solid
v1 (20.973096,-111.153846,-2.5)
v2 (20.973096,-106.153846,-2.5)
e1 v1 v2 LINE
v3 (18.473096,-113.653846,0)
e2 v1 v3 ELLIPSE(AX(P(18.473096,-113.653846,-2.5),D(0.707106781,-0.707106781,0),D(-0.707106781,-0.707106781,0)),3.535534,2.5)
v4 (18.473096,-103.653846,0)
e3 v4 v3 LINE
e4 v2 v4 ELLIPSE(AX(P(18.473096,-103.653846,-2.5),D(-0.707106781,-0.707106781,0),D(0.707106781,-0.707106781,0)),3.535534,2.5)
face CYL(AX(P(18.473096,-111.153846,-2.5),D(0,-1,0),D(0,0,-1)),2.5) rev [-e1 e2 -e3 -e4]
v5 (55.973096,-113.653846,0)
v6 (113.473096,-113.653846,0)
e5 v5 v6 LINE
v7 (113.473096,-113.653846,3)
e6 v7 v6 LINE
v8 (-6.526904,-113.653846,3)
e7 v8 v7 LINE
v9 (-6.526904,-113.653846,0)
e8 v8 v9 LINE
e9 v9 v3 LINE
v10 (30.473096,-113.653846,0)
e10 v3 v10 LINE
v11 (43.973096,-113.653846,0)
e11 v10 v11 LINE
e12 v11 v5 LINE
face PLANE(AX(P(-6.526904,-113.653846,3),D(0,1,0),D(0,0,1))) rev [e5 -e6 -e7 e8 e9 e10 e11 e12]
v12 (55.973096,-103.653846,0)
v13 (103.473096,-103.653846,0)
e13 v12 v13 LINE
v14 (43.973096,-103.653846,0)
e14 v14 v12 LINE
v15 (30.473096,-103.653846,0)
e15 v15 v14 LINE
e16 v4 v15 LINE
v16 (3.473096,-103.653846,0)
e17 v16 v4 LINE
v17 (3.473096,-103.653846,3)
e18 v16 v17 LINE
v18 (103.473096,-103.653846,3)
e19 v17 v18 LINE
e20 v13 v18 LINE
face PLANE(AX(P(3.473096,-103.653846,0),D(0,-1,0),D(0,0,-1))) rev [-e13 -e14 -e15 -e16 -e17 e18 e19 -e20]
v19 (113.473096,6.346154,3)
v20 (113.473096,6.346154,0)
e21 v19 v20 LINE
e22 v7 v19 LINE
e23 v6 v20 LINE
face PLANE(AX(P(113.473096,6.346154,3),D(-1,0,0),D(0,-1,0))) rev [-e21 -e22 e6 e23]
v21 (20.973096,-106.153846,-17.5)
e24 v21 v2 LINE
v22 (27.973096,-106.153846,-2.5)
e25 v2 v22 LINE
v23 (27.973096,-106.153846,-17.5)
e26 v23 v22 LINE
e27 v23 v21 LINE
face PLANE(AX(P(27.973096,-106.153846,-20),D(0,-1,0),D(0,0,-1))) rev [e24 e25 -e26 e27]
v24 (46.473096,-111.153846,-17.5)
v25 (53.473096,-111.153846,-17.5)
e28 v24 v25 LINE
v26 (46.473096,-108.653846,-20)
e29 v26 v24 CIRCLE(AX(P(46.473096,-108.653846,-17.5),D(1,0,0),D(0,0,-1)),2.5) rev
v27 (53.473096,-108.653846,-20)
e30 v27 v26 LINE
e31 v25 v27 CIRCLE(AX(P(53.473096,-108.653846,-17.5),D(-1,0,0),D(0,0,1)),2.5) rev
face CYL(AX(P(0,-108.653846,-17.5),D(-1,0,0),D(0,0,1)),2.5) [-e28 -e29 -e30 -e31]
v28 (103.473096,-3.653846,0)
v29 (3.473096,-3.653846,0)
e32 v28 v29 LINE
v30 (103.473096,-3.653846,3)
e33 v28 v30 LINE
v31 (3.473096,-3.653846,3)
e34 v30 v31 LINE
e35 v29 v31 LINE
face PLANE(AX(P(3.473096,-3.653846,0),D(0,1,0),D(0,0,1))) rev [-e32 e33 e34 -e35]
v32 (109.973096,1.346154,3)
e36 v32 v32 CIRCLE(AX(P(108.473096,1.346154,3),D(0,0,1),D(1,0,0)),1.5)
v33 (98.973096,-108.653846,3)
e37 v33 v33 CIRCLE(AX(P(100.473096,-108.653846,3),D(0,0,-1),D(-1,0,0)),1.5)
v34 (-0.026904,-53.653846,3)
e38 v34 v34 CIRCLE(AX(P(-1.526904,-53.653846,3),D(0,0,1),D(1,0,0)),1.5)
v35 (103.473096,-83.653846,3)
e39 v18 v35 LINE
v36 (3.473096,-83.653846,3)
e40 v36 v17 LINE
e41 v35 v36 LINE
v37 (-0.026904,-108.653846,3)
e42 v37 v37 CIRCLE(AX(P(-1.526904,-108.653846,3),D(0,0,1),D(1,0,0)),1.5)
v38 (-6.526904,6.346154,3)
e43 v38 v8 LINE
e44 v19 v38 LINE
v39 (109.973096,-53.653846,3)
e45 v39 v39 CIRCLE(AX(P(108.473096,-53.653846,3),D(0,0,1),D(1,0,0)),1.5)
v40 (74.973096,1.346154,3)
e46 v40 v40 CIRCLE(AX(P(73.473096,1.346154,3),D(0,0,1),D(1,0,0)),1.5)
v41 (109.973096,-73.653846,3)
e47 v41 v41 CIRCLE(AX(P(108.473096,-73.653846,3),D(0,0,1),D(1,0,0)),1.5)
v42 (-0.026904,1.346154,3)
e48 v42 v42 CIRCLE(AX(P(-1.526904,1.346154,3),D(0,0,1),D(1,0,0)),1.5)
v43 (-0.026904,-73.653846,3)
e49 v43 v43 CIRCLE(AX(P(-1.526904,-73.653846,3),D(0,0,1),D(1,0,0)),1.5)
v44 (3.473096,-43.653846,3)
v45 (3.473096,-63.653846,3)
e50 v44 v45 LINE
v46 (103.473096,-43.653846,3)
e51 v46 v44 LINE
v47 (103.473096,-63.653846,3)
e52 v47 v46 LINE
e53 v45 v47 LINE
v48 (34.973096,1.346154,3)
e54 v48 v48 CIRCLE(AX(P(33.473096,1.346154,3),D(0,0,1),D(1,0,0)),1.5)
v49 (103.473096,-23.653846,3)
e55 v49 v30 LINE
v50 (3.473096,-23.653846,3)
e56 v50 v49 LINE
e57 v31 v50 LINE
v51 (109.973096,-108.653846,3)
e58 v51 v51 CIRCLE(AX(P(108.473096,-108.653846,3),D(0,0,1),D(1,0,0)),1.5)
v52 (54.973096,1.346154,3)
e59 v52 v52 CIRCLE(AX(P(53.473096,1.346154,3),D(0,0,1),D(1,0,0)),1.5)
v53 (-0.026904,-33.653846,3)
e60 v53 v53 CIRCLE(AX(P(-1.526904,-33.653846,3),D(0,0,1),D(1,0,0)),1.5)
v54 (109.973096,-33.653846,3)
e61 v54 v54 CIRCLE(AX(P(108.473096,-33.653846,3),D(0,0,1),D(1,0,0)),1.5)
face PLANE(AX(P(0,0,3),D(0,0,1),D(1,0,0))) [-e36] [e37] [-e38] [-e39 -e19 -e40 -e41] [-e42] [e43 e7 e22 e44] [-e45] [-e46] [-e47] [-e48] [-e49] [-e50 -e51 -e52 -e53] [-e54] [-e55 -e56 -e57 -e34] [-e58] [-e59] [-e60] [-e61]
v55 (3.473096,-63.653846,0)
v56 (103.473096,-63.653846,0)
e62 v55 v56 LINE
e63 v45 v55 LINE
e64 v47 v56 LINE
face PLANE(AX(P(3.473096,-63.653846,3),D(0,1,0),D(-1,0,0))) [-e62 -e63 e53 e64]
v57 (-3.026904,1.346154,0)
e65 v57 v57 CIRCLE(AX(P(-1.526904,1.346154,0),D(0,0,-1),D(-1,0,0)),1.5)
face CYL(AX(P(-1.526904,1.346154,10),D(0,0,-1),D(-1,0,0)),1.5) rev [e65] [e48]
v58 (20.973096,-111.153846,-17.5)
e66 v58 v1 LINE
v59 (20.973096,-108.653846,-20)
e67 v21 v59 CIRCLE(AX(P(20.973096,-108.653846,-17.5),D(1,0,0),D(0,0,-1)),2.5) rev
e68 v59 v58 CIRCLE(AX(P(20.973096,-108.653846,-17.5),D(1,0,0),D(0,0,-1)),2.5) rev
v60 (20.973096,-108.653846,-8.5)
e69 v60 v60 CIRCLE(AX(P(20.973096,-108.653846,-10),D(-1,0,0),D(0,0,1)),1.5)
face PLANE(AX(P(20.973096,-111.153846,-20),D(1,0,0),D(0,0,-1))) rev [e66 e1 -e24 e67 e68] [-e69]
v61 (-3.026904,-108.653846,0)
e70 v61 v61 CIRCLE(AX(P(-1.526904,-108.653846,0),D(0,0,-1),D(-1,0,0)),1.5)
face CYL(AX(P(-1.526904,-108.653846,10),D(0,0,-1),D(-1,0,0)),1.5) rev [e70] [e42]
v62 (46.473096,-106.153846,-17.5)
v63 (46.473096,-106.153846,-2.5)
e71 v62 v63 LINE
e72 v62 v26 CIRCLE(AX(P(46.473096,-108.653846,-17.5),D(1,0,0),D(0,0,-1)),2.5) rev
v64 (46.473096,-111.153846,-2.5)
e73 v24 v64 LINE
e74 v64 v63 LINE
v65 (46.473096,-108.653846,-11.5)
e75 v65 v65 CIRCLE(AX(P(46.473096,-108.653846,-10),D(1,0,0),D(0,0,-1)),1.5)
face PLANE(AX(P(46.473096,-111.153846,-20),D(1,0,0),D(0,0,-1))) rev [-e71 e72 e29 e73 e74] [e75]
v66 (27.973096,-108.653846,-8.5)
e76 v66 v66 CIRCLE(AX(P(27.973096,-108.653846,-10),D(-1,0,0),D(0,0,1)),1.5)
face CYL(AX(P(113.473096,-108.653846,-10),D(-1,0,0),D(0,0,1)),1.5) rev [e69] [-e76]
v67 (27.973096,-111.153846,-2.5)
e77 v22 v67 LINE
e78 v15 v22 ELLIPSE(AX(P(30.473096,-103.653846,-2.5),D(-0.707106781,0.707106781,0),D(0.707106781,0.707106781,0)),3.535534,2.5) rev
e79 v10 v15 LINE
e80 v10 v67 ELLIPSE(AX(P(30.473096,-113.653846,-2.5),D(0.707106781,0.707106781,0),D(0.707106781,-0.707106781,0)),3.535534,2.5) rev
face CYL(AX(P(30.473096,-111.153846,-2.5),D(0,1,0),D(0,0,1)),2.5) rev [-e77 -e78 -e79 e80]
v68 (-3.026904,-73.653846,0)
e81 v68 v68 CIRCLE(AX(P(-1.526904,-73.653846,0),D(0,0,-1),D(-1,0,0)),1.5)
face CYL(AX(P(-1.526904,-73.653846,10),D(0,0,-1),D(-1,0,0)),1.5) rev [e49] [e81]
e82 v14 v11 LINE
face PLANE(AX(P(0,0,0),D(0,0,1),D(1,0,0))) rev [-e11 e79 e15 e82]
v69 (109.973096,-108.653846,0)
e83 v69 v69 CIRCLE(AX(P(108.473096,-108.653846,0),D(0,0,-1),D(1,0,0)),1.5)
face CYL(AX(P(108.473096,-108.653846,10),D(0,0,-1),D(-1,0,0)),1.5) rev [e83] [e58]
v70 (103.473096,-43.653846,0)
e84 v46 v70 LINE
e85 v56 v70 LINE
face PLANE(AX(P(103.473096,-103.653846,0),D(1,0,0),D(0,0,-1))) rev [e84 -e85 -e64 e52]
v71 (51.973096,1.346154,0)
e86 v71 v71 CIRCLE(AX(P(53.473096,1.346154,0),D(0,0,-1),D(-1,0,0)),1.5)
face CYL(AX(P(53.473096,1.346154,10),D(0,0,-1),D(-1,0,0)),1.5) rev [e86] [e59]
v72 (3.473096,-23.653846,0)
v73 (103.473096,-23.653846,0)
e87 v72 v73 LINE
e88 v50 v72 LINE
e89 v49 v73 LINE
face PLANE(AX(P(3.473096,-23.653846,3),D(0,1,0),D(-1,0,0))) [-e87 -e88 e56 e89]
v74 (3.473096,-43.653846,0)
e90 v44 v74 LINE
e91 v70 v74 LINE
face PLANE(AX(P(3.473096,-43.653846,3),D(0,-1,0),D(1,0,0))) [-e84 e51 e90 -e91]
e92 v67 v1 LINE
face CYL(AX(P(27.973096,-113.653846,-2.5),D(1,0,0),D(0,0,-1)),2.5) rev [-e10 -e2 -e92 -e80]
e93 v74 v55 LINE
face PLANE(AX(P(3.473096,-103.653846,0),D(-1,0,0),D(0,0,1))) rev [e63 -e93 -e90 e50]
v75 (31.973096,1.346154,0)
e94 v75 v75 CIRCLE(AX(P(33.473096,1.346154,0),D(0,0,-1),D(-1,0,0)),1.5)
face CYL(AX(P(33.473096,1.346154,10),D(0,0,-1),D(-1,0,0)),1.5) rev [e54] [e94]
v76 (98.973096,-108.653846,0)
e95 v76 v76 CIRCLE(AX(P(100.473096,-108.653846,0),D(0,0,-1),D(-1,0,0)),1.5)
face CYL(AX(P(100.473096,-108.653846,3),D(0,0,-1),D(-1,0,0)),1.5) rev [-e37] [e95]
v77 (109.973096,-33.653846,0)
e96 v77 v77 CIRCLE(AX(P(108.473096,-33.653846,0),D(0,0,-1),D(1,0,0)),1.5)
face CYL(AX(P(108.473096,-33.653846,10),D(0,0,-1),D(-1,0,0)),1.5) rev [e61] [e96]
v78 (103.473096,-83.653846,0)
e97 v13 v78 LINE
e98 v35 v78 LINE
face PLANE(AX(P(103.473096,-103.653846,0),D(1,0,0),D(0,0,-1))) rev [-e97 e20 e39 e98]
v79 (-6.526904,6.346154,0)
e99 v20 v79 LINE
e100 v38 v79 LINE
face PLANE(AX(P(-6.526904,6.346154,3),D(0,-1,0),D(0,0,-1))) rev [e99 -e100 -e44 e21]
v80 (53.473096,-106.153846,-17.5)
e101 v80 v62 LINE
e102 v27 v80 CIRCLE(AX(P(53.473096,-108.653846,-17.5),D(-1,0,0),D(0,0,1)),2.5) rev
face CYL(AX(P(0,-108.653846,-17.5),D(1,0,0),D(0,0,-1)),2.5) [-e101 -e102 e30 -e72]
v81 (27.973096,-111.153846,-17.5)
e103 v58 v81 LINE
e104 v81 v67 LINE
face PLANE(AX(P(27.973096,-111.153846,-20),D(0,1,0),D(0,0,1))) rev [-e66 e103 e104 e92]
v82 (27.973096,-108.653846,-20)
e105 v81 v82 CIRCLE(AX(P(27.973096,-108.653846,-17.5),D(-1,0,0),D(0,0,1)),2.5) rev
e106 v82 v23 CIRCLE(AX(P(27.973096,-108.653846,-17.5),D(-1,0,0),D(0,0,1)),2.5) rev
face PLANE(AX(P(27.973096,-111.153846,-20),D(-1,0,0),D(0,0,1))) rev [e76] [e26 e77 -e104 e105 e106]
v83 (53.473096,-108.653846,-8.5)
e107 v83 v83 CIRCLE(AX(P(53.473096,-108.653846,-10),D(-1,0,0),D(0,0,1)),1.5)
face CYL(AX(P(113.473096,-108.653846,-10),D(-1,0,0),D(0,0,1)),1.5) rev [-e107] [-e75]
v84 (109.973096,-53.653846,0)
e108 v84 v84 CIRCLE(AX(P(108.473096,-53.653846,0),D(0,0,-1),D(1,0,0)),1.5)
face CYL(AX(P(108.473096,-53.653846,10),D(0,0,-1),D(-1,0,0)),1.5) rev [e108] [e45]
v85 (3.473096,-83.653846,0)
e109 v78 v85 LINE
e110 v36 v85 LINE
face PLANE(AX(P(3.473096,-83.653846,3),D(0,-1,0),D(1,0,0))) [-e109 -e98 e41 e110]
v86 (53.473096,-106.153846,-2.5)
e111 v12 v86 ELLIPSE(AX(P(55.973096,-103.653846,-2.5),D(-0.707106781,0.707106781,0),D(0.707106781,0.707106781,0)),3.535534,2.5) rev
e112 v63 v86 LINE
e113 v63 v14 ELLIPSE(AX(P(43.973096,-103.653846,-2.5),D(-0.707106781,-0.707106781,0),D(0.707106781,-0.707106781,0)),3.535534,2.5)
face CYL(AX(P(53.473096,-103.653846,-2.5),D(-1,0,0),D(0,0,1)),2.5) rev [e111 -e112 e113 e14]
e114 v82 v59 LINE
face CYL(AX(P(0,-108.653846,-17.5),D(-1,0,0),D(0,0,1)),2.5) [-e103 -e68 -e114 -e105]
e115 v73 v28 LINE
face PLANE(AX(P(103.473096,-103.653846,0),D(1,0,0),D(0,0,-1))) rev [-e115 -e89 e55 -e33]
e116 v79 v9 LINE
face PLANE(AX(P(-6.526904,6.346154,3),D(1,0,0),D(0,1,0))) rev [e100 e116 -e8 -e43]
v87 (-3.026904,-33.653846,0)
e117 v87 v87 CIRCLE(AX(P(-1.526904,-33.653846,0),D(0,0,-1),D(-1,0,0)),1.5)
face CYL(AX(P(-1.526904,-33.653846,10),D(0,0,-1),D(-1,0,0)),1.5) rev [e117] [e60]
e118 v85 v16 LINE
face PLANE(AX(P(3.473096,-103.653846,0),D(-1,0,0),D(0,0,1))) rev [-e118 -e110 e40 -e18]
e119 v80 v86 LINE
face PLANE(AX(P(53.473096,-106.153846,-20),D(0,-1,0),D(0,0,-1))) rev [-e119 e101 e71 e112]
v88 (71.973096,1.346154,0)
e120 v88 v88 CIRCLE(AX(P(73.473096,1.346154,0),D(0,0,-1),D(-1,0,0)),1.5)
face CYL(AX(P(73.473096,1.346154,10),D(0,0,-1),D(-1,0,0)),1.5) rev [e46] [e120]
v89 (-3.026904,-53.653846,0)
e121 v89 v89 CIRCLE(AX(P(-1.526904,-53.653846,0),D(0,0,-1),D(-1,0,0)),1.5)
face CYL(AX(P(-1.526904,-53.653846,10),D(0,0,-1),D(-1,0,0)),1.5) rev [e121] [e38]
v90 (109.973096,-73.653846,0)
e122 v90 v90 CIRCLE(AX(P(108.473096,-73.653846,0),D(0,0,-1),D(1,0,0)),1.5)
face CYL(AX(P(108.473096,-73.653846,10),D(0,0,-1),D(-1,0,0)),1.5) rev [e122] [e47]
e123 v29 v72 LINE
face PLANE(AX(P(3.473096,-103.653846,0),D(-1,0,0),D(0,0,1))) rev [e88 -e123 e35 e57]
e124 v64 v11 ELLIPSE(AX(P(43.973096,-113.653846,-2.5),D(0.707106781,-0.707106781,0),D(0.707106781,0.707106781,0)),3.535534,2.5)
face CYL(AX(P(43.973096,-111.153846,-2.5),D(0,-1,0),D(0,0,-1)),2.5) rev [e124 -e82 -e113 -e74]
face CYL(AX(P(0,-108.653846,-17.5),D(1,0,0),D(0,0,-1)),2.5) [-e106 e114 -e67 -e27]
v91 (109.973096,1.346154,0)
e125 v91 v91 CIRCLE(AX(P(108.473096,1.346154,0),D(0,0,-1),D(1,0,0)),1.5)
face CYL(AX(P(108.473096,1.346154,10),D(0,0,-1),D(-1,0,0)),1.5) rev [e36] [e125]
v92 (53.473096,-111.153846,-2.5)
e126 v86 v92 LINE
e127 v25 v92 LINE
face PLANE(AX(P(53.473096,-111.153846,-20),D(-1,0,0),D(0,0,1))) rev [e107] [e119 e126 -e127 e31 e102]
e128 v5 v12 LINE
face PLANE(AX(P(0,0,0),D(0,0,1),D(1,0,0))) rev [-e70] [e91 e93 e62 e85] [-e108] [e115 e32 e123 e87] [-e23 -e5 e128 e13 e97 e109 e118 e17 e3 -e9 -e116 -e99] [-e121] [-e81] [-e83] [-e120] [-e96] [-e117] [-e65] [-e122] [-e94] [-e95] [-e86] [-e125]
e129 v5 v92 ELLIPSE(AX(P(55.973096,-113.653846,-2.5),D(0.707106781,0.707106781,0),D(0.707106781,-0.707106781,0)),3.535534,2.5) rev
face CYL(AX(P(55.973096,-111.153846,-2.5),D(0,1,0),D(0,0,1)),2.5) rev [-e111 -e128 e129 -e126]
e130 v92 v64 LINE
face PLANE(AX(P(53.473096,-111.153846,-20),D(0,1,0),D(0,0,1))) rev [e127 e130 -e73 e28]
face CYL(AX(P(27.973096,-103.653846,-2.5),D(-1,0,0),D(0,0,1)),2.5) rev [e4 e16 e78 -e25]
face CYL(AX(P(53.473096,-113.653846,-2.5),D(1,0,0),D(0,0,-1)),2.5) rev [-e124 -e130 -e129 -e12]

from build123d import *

# Parameters (mm, degrees)
ESBO_O1_W                = 120
ESBO_O1_H                = 120
RESSALTO_EXTRUS_O1_DEPTH = 3
ESBO_O2_W                = 100
ESBO_O2_H                = 100
CORTE_EXTRUS_O1_DEPTH    = 161.631068924
ESBO_O5_W                = 7
ESBO_O5_H                = 5
RESSALTO_EXTRUS_O2_DEPTH = 20
ESBO_O6_R                = 1.5
CORTE_EXTRUS_O2_DEPTH    = 10
ESBO_O7_R                = 1.5
CORTE_EXTRUS_O3_DEPTH    = 162.843567384
ESBO_O8_R                = 1.5
CORTE_EXTRUS_O4_DEPTH    = 148.896743526
FILETE2_R                = 2.5
ESBO_O9_W                = 100
ESBO_O9_H                = 20
RESSALTO_EXTRUS_O3_DEPTH = 3
ESBO_O10_R               = 1.5
CORTE_EXTRUS_O5_DEPTH    = 10


with BuildPart() as part:
    # Esboço1 → Ressalto-extrusão1 (new body)
    with BuildSketch(Plane.XY):
        with Locations((53.473096186, -53.653846154)):
            Rectangle(ESBO_O1_W, ESBO_O1_H)
    extrude(amount=RESSALTO_EXTRUS_O1_DEPTH)

    # Esboço2 → Corte-extrusão1 (cut, through all)
    with BuildSketch(Plane.XY.offset(3)):
        with Locations((53.473096186, -53.653846154)):
            Rectangle(ESBO_O2_W, ESBO_O2_H)
    extrude(amount=-CORTE_EXTRUS_O1_DEPTH, mode=Mode.SUBTRACT)

    # Esboço5 → Ressalto-extrusão2 (add)
    with BuildSketch(Plane(origin=(0, 0, 0), x_dir=(-1, 0, 0), z_dir=(0, 0, -1))):
        with Locations((-49.973096186, -108.653846154)):
            Rectangle(ESBO_O5_W, ESBO_O5_H)
        with Locations((-24.473096186, -108.653846154)):
            Rectangle(ESBO_O5_W, ESBO_O5_H)
    extrude(amount=RESSALTO_EXTRUS_O2_DEPTH)

    # Esboço6 → Corte-extrusão2 (cut)
    with BuildSketch(Plane(origin=(0, 0, 0), x_dir=(-1, 0, 0), z_dir=(0, 0, -1))):
        with Locations((1.526903814, -108.653846154)):
            Circle(ESBO_O6_R)
        with Locations((1.526903814, -73.653846154)):
            Circle(ESBO_O6_R)
        with Locations((1.526903814, -53.653846154)):
            Circle(ESBO_O6_R)
        with Locations((1.526903814, -33.653846154)):
            Circle(ESBO_O6_R)
        with Locations((1.526903814, 1.346153846)):
            Circle(ESBO_O6_R)
        with Locations(Location((-108.473096186, 1.346153846, 0), (0, 0, 180))):
            Circle(ESBO_O6_R)
        with Locations(Location((-108.473096186, -33.653846154, 0), (0, 0, 180))):
            Circle(ESBO_O6_R)
        with Locations(Location((-108.473096186, -53.653846154, 0), (0, 0, 180))):
            Circle(ESBO_O6_R)
        with Locations(Location((-108.473096186, -73.653846154, 0), (0, 0, 180))):
            Circle(ESBO_O6_R)
        with Locations(Location((-108.473096186, -108.653846154, 0), (0, 0, 180))):
            Circle(ESBO_O6_R)
    extrude(amount=-CORTE_EXTRUS_O2_DEPTH, mode=Mode.SUBTRACT)

    # Esboço7 → Corte-extrusão3 (cut, through all)
    with BuildSketch(Plane(origin=(0, 0, 0), x_dir=(-1, 0, 0), z_dir=(0, 0, -1))):
        with Locations((-100.473096186, -108.653846154)):
            Circle(ESBO_O7_R)
    extrude(amount=-CORTE_EXTRUS_O3_DEPTH, mode=Mode.SUBTRACT)

    # Esboço8 → Corte-extrusão4 (cut, through all)
    with BuildSketch(Plane.ZY.offset(-20.973096186)):
        with Locations((-10, -108.653846154)):
            Circle(ESBO_O8_R)
    extrude(amount=-CORTE_EXTRUS_O4_DEPTH, mode=Mode.SUBTRACT)

    # Filete2
    filete2_edges = [part.edges().sort_by_distance(p)[0] for p in [
        (49.973096186, -106.153846154, 0),
        (49.973096186, -106.153846154, -20),
        (49.973096186, -111.153846154, -20),
        (46.473096186, -108.653846154, 0),
        (53.473096186, -108.653846154, 0),
        (49.973096186, -111.153846154, 0),
        (24.473096186, -106.153846154, -20),
        (24.473096186, -111.153846154, -20),
        (24.473096186, -106.153846154, 0),
        (27.973096186, -108.653846154, 0),
        (24.473096186, -111.153846154, 0),
        (20.973096186, -108.653846154, 0),
    ]]
    fillet(filete2_edges, radius=FILETE2_R - 0.0001)  # a hair under: the kernel refuses the full size

    # Esboço9 → Ressalto-extrusão3 (add)
    with BuildSketch(Plane(origin=(0, 0, 0), x_dir=(-1, 0, 0), z_dir=(0, 0, -1))):
        with Locations((-53.473096186, -73.653846154)):
            Rectangle(ESBO_O9_W, ESBO_O9_H)
        with Locations((-53.473096186, -33.653846154)):
            Rectangle(ESBO_O9_W, ESBO_O9_H)
    extrude(amount=-RESSALTO_EXTRUS_O3_DEPTH)

    # Esboço10 → Corte-extrusão5 (cut)
    with BuildSketch(Plane(origin=(0, 0, 0), x_dir=(-1, 0, 0), z_dir=(0, 0, -1))):
        with Locations((-33.473096186, 1.346153846)):
            Circle(ESBO_O10_R)
        with Locations((-53.473096186, 1.346153846)):
            Circle(ESBO_O10_R)
        with Locations((-73.473096186, 1.346153846)):
            Circle(ESBO_O10_R)
    extrude(amount=-CORTE_EXTRUS_O5_DEPTH, mode=Mode.SUBTRACT)


solid = part.part
